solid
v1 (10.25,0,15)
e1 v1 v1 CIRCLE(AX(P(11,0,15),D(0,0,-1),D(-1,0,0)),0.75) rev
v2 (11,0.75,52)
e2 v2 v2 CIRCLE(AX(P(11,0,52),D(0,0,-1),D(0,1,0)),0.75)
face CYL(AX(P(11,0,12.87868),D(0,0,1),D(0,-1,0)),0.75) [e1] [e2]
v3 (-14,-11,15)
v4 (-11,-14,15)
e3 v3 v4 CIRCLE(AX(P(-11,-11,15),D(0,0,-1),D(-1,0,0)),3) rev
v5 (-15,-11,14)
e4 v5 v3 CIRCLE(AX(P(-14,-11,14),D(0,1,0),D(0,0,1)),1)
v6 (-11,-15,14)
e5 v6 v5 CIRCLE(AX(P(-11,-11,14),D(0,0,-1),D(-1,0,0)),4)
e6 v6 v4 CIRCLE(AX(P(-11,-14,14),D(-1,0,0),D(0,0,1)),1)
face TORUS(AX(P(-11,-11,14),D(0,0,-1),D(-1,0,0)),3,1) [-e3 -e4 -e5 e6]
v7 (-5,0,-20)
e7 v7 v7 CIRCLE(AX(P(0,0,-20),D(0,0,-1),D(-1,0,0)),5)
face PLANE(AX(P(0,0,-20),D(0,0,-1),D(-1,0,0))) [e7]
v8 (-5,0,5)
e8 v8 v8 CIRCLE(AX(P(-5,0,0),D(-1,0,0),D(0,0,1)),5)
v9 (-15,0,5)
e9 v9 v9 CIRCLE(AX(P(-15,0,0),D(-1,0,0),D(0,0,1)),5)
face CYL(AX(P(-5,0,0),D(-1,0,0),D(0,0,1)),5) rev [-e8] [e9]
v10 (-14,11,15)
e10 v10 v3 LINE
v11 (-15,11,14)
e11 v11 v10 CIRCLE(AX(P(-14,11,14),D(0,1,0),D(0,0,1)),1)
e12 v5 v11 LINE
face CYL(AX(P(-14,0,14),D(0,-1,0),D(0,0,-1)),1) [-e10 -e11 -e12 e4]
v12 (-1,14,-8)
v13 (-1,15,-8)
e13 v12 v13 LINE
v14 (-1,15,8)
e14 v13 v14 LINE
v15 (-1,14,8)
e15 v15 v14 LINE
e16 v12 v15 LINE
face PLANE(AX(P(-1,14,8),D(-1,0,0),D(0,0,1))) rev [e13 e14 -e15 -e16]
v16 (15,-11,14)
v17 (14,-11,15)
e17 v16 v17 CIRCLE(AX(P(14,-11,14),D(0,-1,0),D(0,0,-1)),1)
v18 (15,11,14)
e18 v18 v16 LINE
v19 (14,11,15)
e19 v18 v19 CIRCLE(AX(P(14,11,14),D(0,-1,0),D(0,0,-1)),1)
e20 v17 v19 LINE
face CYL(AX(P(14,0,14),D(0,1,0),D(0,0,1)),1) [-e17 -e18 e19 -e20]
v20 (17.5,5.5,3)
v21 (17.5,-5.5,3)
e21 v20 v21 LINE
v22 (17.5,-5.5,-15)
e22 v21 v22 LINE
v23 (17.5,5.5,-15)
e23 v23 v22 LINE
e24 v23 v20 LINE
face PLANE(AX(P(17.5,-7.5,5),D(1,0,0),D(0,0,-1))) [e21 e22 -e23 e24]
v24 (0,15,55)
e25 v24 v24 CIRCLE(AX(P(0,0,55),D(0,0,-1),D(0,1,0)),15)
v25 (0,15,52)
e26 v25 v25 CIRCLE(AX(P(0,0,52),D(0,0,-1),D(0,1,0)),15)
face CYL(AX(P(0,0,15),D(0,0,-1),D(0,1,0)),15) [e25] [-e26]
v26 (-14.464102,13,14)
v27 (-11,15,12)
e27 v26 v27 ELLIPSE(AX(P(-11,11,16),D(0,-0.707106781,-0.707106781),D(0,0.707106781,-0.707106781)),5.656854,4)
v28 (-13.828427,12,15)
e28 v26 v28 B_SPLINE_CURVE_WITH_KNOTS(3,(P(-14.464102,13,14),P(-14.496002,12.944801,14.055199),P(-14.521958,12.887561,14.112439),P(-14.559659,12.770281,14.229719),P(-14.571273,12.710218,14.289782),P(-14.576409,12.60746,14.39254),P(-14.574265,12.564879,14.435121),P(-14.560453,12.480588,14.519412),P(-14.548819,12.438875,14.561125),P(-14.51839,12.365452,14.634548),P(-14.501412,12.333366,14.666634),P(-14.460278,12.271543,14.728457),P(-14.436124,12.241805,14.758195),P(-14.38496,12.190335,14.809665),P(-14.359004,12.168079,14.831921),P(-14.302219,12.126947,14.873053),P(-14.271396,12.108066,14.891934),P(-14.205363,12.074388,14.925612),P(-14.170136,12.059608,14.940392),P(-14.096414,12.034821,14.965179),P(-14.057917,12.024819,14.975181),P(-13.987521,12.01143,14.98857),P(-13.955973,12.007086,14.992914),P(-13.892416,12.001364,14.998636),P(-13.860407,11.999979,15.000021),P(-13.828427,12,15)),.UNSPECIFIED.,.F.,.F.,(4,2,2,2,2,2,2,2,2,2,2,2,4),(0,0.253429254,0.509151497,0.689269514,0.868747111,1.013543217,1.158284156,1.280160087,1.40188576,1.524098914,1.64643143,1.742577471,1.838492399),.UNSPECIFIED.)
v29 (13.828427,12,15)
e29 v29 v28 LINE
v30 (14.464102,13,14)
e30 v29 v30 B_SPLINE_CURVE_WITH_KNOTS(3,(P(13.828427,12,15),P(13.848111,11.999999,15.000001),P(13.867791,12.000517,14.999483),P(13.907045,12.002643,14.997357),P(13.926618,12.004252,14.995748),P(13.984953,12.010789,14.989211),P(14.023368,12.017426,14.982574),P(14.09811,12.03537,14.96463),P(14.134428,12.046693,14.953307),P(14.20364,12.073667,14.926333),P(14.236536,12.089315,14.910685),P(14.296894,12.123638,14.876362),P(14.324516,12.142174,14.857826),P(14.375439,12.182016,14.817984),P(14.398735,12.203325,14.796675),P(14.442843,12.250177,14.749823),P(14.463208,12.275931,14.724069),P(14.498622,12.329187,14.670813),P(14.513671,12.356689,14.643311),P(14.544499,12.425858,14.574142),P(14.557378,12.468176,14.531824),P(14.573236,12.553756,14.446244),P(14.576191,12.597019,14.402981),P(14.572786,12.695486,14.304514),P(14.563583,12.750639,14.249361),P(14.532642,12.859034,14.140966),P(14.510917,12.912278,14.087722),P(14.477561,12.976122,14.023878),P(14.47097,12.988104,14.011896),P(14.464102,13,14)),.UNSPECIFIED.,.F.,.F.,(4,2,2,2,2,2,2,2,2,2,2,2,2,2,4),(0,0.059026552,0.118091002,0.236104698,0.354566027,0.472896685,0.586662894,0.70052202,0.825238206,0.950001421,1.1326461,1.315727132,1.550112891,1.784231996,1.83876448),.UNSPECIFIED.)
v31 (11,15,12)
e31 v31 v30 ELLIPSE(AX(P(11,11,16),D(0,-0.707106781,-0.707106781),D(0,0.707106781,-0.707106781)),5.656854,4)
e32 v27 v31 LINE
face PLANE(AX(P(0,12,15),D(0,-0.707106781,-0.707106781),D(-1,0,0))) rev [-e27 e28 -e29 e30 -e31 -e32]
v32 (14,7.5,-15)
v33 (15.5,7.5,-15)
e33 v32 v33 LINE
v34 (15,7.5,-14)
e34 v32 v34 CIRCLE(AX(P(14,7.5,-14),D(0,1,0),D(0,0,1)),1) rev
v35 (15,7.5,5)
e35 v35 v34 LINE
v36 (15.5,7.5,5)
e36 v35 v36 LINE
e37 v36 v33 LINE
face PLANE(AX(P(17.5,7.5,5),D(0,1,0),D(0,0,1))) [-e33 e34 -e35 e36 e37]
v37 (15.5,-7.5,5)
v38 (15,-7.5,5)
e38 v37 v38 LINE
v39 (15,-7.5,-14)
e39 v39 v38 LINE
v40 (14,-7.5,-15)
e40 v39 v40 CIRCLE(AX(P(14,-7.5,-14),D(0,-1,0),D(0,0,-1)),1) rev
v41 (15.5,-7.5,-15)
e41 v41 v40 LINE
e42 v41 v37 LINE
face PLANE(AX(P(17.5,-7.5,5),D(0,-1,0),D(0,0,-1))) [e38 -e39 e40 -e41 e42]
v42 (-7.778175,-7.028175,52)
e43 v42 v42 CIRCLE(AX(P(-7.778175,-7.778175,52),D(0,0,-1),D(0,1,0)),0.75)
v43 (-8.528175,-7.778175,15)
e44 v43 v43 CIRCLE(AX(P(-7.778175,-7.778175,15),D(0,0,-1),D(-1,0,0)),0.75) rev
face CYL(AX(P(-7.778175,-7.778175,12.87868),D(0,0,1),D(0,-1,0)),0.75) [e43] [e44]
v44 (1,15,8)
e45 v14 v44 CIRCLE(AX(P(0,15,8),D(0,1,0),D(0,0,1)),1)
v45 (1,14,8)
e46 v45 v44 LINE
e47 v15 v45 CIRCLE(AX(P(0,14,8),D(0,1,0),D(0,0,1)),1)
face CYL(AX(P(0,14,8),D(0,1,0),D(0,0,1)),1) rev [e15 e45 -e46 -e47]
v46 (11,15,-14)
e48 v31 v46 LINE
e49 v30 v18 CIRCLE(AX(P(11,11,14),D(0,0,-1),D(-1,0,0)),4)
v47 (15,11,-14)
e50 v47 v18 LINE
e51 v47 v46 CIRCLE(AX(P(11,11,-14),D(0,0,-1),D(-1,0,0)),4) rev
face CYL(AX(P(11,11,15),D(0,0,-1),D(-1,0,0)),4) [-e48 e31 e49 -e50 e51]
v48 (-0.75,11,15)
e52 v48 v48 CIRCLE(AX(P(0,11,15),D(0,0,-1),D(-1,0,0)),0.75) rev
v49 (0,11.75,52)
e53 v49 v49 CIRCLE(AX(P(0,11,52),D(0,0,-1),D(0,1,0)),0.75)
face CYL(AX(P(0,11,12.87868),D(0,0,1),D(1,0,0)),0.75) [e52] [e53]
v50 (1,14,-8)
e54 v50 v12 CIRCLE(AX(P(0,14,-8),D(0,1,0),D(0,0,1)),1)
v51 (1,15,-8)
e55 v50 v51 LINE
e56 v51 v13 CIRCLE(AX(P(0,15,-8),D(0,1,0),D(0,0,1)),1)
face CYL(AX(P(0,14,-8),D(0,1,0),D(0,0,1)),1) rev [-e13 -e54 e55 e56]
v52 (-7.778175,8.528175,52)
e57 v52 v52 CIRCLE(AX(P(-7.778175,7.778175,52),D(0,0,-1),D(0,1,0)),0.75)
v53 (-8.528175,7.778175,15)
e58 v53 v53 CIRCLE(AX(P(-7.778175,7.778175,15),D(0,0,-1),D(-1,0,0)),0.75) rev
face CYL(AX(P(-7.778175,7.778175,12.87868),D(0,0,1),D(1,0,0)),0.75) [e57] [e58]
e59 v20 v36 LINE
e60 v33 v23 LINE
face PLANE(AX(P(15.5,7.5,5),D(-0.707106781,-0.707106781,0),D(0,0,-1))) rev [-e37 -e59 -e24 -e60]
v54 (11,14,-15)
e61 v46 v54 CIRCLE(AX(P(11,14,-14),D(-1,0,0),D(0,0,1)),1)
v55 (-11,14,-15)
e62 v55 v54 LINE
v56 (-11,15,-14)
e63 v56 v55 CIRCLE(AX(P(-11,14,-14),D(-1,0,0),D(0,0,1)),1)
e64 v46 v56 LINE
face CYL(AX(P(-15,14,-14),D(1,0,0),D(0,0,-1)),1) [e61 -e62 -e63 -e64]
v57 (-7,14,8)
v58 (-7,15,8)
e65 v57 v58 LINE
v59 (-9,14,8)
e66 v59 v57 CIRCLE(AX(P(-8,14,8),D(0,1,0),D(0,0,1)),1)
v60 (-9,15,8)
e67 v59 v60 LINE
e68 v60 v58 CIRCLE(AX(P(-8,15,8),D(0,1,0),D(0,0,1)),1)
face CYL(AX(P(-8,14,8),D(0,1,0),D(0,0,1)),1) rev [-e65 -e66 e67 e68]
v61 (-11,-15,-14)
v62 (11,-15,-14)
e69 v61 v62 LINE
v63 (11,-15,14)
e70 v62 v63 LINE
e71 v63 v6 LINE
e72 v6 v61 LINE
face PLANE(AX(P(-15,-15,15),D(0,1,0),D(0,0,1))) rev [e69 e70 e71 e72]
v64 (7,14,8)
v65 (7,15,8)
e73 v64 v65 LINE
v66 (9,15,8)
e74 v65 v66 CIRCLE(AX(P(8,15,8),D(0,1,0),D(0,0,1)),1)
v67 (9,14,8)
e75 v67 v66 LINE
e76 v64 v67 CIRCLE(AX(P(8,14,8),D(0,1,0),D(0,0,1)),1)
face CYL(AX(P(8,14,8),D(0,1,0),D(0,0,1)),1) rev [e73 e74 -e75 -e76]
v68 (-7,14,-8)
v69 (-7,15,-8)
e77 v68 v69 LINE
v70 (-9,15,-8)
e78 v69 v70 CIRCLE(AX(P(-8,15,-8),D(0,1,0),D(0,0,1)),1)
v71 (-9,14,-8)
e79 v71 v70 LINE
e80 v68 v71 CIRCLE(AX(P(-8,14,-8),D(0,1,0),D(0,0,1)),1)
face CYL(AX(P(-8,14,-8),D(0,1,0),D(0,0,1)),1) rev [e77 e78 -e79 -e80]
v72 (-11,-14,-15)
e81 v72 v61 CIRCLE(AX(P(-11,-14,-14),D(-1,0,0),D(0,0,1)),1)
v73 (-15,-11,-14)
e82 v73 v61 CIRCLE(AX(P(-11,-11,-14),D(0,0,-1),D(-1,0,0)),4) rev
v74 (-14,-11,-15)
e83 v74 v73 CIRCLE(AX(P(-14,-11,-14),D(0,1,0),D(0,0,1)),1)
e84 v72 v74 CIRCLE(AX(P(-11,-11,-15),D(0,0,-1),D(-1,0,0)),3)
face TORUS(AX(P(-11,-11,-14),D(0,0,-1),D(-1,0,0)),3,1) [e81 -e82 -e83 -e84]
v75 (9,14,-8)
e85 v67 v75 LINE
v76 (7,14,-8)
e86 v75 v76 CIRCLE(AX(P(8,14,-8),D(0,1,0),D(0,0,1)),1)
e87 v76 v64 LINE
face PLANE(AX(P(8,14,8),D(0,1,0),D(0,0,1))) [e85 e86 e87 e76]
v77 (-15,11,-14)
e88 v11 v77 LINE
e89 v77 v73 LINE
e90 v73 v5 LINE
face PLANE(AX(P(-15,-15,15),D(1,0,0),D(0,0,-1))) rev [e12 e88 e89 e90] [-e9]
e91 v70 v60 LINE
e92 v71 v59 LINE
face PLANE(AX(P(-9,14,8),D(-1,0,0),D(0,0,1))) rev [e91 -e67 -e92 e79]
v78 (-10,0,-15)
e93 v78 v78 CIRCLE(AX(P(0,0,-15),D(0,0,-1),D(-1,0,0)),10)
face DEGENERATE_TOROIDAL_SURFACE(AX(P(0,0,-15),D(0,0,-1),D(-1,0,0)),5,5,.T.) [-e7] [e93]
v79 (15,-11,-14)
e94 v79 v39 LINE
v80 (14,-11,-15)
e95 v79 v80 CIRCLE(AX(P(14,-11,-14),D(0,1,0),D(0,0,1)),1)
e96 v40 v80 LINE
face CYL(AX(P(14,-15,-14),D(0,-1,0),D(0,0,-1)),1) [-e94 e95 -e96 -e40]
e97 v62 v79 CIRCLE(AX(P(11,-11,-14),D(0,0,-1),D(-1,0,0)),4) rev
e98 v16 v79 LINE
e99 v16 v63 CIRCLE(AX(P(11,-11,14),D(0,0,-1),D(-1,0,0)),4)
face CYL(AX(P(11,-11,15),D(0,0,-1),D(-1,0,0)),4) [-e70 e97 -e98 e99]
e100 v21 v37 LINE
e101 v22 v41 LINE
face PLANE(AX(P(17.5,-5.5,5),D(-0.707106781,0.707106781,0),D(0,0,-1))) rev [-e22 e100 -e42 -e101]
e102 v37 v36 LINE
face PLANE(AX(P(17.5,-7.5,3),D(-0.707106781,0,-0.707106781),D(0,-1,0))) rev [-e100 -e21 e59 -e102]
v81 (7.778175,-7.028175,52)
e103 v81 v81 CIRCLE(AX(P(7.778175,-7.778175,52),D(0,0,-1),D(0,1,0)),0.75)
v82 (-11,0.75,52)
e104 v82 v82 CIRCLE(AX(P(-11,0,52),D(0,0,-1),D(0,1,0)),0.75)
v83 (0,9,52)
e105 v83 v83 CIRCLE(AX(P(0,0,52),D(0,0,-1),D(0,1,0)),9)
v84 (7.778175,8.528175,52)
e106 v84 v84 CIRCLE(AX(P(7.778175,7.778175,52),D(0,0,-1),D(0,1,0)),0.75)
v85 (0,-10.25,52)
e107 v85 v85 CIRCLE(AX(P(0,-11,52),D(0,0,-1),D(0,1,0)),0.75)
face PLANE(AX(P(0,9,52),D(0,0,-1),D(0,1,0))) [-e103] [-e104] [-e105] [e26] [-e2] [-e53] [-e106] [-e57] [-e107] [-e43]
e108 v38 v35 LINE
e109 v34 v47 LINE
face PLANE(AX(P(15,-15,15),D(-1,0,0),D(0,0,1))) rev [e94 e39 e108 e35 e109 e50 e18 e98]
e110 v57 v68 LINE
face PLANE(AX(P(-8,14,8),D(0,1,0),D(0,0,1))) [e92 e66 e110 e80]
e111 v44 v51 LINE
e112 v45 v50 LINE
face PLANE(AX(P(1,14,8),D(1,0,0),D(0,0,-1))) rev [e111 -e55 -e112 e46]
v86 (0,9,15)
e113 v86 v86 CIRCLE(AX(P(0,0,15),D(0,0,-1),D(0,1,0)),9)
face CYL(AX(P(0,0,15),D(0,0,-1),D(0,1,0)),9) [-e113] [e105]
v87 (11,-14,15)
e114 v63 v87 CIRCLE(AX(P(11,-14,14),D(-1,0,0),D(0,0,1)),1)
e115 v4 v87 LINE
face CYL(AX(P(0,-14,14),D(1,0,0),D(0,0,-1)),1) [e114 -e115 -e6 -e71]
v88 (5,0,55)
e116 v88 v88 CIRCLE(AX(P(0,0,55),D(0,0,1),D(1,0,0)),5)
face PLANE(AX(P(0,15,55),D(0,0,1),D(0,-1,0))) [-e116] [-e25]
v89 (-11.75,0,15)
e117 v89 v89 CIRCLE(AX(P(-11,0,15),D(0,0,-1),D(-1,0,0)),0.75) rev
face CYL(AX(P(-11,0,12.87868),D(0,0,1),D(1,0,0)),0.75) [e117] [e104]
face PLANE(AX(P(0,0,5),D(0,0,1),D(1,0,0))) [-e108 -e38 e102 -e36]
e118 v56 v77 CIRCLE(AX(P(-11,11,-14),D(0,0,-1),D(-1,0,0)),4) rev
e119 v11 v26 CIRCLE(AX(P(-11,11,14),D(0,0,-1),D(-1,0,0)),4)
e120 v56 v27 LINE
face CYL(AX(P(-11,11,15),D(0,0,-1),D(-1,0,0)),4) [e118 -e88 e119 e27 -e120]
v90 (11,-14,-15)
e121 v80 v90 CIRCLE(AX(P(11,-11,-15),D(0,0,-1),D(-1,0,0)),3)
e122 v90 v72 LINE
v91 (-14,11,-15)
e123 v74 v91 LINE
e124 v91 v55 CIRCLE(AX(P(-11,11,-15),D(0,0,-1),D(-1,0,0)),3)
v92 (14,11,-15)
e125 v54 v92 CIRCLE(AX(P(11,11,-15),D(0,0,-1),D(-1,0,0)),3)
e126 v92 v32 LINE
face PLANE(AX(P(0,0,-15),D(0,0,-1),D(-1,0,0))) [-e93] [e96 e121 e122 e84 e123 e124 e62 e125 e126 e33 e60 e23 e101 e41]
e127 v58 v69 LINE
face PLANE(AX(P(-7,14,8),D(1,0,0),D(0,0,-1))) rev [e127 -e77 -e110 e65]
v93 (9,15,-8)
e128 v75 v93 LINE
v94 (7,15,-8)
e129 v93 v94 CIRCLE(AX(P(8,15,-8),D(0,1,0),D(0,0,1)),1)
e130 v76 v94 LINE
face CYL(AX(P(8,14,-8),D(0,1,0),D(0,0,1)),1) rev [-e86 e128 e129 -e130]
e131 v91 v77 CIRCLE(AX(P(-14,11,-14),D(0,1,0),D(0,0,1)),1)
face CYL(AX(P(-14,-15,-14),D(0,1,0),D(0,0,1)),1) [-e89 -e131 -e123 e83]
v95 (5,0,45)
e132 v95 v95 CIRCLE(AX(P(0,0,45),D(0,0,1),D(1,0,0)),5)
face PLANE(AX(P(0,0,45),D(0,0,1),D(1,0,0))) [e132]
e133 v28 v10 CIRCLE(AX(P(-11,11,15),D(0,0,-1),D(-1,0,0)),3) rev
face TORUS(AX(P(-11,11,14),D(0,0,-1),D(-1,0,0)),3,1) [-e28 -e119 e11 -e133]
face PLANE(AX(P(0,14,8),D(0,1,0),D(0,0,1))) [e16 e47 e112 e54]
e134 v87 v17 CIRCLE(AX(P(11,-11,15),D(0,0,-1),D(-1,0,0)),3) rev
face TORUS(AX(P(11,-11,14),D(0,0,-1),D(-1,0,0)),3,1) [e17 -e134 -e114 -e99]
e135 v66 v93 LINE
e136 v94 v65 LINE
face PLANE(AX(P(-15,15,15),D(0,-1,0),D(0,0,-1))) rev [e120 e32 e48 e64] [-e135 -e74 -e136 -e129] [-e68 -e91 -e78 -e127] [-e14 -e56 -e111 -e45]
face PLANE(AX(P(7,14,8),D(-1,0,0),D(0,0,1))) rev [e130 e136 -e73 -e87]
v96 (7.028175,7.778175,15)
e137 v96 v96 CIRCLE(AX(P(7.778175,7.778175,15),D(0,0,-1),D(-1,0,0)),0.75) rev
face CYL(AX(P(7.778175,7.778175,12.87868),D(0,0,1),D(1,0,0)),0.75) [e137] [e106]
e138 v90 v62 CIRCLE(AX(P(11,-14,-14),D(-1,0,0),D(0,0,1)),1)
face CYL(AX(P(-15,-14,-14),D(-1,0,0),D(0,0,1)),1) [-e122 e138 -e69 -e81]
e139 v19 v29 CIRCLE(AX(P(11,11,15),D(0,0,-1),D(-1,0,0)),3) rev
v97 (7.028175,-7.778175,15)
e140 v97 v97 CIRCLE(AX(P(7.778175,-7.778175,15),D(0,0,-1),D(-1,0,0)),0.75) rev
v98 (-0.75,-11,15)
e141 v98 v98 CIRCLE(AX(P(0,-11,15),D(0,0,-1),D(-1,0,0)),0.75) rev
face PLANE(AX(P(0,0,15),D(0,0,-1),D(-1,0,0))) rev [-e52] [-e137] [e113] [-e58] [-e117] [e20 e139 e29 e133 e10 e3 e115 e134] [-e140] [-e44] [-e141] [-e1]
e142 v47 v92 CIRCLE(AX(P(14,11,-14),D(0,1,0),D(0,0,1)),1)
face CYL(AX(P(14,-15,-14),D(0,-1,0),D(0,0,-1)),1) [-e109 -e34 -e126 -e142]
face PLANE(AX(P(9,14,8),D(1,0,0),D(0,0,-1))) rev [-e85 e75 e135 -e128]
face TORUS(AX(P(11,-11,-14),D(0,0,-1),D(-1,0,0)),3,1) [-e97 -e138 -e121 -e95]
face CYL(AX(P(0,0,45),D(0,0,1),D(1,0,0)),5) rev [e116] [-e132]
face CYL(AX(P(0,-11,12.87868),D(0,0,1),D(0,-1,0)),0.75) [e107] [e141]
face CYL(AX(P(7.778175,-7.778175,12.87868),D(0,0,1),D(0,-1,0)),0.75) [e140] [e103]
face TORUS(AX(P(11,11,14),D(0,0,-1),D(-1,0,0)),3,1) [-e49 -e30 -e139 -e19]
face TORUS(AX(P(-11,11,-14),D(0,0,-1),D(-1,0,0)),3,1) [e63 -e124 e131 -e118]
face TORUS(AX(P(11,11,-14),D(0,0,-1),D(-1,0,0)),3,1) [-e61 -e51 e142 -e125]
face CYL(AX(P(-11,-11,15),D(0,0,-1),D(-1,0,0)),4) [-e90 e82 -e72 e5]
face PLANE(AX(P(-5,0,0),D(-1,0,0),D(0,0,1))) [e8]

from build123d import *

# Parameters (mm, degrees)
SKETCH2_W           = 30
SKETCH2_H           = 30
BOSS_EXTRUDE1_DEPTH = 15
FILLET1_R           = 4
CHAMFER1_SIZE       = 3
FILLET2_R           = 1
SKETCH4_R           = 10
BOSS_EXTRUDE2_DEPTH = 5
FILLET3_R           = 5
SKETCH6_W           = 5
SKETCH6_H           = 15
BOSS_EXTRUDE3_DEPTH = 20
CHAMFER2_SIZE       = 2
SKETCH7_R           = 5
CUT_EXTRUDE1_DEPTH  = 10
SKETCH8_R           = 0.75
BOSS_EXTRUDE4_DEPTH = 40
CIRPATTERN1_COUNT   = 8
SKETCH10_R          = 5
CUT_EXTRUDE3_DEPTH  = 10
CUT_EXTRUDE4_DEPTH  = 1
LPATTERN1_COUNT     = 2
LPATTERN1_PITCH     = 8
LPATTERN1_COL_COUNT = 2
LPATTERN1_COL_PITCH = 8


# Some blends are built 0.0001 mm under size
with BuildPart() as part:
    # Sketch2 → Boss-Extrude1 (new, symmetric)
    with BuildSketch(Plane.XY):
        Rectangle(SKETCH2_W, SKETCH2_H)
    extrude(amount=BOSS_EXTRUDE1_DEPTH, both=True)

    # Sketch3 → Revolve1 (revolve)
    with BuildSketch(Plane(origin=(0, 0, 0), x_dir=(0, 0, -1), z_dir=(1, 0, 0))):
        Polygon((-15, 0), (-15, 9), (-52, 9), (-52, 15), (-55, 15), (-55, 0), align=None)
    revolve(axis=Axis((0, 0, 15), (0, 0, 1)))

    # Fillet1
    fillet1_edges = [part.edges().sort_by_distance(p)[0] for p in [
        (15, -15, 0),
        (-15, -15, 0),
        (-15, 15, 0),
        (15, 15, 0),
    ]]
    fillet(fillet1_edges, radius=FILLET1_R)

    # Chamfer1
    # the kernel refuses this chamfer: 3 mm, written as the material it takes off along each edge
    with BuildSketch(Plane(origin=(18.715048964, 15, 15), x_dir=(0, -0.9996219169112969, 0.02749587661058621), z_dir=(-1, 0, 0))) as chamfer1_piece_1:
        Polygon((CHAMFER1_SIZE * 0.999621916911, -CHAMFER1_SIZE * 0.0274958766106), (-CHAMFER1_SIZE * 0.0274958766106, -CHAMFER1_SIZE * 0.999621916911), (0, 0), align=None)
    extrude(amount=37.430097928, mode=Mode.SUBTRACT)

    # Fillet2
    fillet2_edges = [part.edges().sort_by_distance(p)[0] for p in [
        (-13.828427125, 13.828427125, -15),
        (0, 15, -15),
        (13.828427125, 13.828427125, -15),
        (15, 0, -15),
        (13.828427125, -13.828427125, -15),
        (0, -15, -15),
        (-13.828427125, -13.828427125, -15),
        (-14.968118785, 11.50401717, 15),
        (14.968118785, 11.50401717, 15),
        (15, 0, 15),
        (13.828427125, -13.828427125, 15),
        (0, -15, 15),
        (-13.828427125, -13.828427125, 15),
        (-15, 0, -15),
        (-15, 0, 15),
    ]]
    fillet(fillet2_edges, radius=FILLET2_R)

    # Sketch4 → Boss-Extrude2 (add)
    with BuildSketch(Plane(origin=(0, 0, -15), x_dir=(-1, 0, 0), z_dir=(0, 0, -1))):
        Circle(SKETCH4_R)
    extrude(amount=BOSS_EXTRUDE2_DEPTH)

    # Fillet3
    fillet3_edges = [part.edges().sort_by_distance(p)[0] for p in [
        (10, 0, -20),
    ]]
    fillet(fillet3_edges, radius=FILLET3_R - 0.0001)  # a hair under: the kernel refuses the full size

    # Sketch6 → Boss-Extrude3 (add)
    with BuildSketch(Plane(origin=(0, 0, -15), x_dir=(-1, 0, 0), z_dir=(0, 0, -1))):
        with Locations((-15, 0)):
            Rectangle(SKETCH6_W, SKETCH6_H)
    extrude(amount=-BOSS_EXTRUDE3_DEPTH)

    # Chamfer2
    chamfer2_edges = [part.edges().sort_by_distance(p)[0] for p in [
        (17.5, 7.5, -5),
        (17.5, 0, 5),
        (17.5, -7.5, -5),
    ]]
    chamfer(chamfer2_edges, length=CHAMFER2_SIZE)

    # Sketch7 → Cut-Extrude1 (cut)
    with BuildSketch(Plane.XY.offset(55)):
        Circle(SKETCH7_R)
    extrude(amount=-CUT_EXTRUDE1_DEPTH, mode=Mode.SUBTRACT)

    # Sketch8 → Boss-Extrude4 (add)
    with BuildSketch(Plane.XY.offset(55)):
        with Locations(Location((0, 11, 0), (0, 0, 90))):
            Circle(SKETCH8_R)
    boss_extrude4 = extrude(amount=-BOSS_EXTRUDE4_DEPTH)

    # CirPattern1: Boss-Extrude4 ×8 about axis
    cirpattern1_axis = Axis((0, 0, 0), (0, 0, 1))
    for i in range(1, CIRPATTERN1_COUNT):
        add(boss_extrude4.rotate(cirpattern1_axis, i * 360 / CIRPATTERN1_COUNT))

    # Sketch10 → Cut-Extrude3 (cut)
    with BuildSketch(Plane.ZY.offset(15)):
        Circle(SKETCH10_R)
    extrude(amount=-CUT_EXTRUDE3_DEPTH, mode=Mode.SUBTRACT)

    # Sketch11 → Cut-Extrude4 (cut)
    with BuildSketch(Plane(origin=(0, 15, 0), x_dir=(1, 0, 0), z_dir=(0, 1, 0))):
        with BuildLine():
            Line((-1, -8), (-1, 8))
            ThreePointArc((-1, 8), (0, 9), (1, 8))
            Line((1, 8), (1, -8))
            ThreePointArc((1, -8), (0, -9), (-1, -8))
        make_face()
    cut_extrude4 = extrude(amount=-CUT_EXTRUDE4_DEPTH, mode=Mode.SUBTRACT)

    # LPattern1: Cut-Extrude4 ×2
    with Locations(*[(i * LPATTERN1_PITCH, 0, 0) for i in range(1, LPATTERN1_COUNT)]):
        add(cut_extrude4, mode=Mode.SUBTRACT)

    # LPattern1 col: Cut-Extrude4 ×2
    with Locations(*[(-i * LPATTERN1_COL_PITCH, 0, 0) for i in range(1, LPATTERN1_COL_COUNT)]):
        add(cut_extrude4, mode=Mode.SUBTRACT)


solid = part.part
